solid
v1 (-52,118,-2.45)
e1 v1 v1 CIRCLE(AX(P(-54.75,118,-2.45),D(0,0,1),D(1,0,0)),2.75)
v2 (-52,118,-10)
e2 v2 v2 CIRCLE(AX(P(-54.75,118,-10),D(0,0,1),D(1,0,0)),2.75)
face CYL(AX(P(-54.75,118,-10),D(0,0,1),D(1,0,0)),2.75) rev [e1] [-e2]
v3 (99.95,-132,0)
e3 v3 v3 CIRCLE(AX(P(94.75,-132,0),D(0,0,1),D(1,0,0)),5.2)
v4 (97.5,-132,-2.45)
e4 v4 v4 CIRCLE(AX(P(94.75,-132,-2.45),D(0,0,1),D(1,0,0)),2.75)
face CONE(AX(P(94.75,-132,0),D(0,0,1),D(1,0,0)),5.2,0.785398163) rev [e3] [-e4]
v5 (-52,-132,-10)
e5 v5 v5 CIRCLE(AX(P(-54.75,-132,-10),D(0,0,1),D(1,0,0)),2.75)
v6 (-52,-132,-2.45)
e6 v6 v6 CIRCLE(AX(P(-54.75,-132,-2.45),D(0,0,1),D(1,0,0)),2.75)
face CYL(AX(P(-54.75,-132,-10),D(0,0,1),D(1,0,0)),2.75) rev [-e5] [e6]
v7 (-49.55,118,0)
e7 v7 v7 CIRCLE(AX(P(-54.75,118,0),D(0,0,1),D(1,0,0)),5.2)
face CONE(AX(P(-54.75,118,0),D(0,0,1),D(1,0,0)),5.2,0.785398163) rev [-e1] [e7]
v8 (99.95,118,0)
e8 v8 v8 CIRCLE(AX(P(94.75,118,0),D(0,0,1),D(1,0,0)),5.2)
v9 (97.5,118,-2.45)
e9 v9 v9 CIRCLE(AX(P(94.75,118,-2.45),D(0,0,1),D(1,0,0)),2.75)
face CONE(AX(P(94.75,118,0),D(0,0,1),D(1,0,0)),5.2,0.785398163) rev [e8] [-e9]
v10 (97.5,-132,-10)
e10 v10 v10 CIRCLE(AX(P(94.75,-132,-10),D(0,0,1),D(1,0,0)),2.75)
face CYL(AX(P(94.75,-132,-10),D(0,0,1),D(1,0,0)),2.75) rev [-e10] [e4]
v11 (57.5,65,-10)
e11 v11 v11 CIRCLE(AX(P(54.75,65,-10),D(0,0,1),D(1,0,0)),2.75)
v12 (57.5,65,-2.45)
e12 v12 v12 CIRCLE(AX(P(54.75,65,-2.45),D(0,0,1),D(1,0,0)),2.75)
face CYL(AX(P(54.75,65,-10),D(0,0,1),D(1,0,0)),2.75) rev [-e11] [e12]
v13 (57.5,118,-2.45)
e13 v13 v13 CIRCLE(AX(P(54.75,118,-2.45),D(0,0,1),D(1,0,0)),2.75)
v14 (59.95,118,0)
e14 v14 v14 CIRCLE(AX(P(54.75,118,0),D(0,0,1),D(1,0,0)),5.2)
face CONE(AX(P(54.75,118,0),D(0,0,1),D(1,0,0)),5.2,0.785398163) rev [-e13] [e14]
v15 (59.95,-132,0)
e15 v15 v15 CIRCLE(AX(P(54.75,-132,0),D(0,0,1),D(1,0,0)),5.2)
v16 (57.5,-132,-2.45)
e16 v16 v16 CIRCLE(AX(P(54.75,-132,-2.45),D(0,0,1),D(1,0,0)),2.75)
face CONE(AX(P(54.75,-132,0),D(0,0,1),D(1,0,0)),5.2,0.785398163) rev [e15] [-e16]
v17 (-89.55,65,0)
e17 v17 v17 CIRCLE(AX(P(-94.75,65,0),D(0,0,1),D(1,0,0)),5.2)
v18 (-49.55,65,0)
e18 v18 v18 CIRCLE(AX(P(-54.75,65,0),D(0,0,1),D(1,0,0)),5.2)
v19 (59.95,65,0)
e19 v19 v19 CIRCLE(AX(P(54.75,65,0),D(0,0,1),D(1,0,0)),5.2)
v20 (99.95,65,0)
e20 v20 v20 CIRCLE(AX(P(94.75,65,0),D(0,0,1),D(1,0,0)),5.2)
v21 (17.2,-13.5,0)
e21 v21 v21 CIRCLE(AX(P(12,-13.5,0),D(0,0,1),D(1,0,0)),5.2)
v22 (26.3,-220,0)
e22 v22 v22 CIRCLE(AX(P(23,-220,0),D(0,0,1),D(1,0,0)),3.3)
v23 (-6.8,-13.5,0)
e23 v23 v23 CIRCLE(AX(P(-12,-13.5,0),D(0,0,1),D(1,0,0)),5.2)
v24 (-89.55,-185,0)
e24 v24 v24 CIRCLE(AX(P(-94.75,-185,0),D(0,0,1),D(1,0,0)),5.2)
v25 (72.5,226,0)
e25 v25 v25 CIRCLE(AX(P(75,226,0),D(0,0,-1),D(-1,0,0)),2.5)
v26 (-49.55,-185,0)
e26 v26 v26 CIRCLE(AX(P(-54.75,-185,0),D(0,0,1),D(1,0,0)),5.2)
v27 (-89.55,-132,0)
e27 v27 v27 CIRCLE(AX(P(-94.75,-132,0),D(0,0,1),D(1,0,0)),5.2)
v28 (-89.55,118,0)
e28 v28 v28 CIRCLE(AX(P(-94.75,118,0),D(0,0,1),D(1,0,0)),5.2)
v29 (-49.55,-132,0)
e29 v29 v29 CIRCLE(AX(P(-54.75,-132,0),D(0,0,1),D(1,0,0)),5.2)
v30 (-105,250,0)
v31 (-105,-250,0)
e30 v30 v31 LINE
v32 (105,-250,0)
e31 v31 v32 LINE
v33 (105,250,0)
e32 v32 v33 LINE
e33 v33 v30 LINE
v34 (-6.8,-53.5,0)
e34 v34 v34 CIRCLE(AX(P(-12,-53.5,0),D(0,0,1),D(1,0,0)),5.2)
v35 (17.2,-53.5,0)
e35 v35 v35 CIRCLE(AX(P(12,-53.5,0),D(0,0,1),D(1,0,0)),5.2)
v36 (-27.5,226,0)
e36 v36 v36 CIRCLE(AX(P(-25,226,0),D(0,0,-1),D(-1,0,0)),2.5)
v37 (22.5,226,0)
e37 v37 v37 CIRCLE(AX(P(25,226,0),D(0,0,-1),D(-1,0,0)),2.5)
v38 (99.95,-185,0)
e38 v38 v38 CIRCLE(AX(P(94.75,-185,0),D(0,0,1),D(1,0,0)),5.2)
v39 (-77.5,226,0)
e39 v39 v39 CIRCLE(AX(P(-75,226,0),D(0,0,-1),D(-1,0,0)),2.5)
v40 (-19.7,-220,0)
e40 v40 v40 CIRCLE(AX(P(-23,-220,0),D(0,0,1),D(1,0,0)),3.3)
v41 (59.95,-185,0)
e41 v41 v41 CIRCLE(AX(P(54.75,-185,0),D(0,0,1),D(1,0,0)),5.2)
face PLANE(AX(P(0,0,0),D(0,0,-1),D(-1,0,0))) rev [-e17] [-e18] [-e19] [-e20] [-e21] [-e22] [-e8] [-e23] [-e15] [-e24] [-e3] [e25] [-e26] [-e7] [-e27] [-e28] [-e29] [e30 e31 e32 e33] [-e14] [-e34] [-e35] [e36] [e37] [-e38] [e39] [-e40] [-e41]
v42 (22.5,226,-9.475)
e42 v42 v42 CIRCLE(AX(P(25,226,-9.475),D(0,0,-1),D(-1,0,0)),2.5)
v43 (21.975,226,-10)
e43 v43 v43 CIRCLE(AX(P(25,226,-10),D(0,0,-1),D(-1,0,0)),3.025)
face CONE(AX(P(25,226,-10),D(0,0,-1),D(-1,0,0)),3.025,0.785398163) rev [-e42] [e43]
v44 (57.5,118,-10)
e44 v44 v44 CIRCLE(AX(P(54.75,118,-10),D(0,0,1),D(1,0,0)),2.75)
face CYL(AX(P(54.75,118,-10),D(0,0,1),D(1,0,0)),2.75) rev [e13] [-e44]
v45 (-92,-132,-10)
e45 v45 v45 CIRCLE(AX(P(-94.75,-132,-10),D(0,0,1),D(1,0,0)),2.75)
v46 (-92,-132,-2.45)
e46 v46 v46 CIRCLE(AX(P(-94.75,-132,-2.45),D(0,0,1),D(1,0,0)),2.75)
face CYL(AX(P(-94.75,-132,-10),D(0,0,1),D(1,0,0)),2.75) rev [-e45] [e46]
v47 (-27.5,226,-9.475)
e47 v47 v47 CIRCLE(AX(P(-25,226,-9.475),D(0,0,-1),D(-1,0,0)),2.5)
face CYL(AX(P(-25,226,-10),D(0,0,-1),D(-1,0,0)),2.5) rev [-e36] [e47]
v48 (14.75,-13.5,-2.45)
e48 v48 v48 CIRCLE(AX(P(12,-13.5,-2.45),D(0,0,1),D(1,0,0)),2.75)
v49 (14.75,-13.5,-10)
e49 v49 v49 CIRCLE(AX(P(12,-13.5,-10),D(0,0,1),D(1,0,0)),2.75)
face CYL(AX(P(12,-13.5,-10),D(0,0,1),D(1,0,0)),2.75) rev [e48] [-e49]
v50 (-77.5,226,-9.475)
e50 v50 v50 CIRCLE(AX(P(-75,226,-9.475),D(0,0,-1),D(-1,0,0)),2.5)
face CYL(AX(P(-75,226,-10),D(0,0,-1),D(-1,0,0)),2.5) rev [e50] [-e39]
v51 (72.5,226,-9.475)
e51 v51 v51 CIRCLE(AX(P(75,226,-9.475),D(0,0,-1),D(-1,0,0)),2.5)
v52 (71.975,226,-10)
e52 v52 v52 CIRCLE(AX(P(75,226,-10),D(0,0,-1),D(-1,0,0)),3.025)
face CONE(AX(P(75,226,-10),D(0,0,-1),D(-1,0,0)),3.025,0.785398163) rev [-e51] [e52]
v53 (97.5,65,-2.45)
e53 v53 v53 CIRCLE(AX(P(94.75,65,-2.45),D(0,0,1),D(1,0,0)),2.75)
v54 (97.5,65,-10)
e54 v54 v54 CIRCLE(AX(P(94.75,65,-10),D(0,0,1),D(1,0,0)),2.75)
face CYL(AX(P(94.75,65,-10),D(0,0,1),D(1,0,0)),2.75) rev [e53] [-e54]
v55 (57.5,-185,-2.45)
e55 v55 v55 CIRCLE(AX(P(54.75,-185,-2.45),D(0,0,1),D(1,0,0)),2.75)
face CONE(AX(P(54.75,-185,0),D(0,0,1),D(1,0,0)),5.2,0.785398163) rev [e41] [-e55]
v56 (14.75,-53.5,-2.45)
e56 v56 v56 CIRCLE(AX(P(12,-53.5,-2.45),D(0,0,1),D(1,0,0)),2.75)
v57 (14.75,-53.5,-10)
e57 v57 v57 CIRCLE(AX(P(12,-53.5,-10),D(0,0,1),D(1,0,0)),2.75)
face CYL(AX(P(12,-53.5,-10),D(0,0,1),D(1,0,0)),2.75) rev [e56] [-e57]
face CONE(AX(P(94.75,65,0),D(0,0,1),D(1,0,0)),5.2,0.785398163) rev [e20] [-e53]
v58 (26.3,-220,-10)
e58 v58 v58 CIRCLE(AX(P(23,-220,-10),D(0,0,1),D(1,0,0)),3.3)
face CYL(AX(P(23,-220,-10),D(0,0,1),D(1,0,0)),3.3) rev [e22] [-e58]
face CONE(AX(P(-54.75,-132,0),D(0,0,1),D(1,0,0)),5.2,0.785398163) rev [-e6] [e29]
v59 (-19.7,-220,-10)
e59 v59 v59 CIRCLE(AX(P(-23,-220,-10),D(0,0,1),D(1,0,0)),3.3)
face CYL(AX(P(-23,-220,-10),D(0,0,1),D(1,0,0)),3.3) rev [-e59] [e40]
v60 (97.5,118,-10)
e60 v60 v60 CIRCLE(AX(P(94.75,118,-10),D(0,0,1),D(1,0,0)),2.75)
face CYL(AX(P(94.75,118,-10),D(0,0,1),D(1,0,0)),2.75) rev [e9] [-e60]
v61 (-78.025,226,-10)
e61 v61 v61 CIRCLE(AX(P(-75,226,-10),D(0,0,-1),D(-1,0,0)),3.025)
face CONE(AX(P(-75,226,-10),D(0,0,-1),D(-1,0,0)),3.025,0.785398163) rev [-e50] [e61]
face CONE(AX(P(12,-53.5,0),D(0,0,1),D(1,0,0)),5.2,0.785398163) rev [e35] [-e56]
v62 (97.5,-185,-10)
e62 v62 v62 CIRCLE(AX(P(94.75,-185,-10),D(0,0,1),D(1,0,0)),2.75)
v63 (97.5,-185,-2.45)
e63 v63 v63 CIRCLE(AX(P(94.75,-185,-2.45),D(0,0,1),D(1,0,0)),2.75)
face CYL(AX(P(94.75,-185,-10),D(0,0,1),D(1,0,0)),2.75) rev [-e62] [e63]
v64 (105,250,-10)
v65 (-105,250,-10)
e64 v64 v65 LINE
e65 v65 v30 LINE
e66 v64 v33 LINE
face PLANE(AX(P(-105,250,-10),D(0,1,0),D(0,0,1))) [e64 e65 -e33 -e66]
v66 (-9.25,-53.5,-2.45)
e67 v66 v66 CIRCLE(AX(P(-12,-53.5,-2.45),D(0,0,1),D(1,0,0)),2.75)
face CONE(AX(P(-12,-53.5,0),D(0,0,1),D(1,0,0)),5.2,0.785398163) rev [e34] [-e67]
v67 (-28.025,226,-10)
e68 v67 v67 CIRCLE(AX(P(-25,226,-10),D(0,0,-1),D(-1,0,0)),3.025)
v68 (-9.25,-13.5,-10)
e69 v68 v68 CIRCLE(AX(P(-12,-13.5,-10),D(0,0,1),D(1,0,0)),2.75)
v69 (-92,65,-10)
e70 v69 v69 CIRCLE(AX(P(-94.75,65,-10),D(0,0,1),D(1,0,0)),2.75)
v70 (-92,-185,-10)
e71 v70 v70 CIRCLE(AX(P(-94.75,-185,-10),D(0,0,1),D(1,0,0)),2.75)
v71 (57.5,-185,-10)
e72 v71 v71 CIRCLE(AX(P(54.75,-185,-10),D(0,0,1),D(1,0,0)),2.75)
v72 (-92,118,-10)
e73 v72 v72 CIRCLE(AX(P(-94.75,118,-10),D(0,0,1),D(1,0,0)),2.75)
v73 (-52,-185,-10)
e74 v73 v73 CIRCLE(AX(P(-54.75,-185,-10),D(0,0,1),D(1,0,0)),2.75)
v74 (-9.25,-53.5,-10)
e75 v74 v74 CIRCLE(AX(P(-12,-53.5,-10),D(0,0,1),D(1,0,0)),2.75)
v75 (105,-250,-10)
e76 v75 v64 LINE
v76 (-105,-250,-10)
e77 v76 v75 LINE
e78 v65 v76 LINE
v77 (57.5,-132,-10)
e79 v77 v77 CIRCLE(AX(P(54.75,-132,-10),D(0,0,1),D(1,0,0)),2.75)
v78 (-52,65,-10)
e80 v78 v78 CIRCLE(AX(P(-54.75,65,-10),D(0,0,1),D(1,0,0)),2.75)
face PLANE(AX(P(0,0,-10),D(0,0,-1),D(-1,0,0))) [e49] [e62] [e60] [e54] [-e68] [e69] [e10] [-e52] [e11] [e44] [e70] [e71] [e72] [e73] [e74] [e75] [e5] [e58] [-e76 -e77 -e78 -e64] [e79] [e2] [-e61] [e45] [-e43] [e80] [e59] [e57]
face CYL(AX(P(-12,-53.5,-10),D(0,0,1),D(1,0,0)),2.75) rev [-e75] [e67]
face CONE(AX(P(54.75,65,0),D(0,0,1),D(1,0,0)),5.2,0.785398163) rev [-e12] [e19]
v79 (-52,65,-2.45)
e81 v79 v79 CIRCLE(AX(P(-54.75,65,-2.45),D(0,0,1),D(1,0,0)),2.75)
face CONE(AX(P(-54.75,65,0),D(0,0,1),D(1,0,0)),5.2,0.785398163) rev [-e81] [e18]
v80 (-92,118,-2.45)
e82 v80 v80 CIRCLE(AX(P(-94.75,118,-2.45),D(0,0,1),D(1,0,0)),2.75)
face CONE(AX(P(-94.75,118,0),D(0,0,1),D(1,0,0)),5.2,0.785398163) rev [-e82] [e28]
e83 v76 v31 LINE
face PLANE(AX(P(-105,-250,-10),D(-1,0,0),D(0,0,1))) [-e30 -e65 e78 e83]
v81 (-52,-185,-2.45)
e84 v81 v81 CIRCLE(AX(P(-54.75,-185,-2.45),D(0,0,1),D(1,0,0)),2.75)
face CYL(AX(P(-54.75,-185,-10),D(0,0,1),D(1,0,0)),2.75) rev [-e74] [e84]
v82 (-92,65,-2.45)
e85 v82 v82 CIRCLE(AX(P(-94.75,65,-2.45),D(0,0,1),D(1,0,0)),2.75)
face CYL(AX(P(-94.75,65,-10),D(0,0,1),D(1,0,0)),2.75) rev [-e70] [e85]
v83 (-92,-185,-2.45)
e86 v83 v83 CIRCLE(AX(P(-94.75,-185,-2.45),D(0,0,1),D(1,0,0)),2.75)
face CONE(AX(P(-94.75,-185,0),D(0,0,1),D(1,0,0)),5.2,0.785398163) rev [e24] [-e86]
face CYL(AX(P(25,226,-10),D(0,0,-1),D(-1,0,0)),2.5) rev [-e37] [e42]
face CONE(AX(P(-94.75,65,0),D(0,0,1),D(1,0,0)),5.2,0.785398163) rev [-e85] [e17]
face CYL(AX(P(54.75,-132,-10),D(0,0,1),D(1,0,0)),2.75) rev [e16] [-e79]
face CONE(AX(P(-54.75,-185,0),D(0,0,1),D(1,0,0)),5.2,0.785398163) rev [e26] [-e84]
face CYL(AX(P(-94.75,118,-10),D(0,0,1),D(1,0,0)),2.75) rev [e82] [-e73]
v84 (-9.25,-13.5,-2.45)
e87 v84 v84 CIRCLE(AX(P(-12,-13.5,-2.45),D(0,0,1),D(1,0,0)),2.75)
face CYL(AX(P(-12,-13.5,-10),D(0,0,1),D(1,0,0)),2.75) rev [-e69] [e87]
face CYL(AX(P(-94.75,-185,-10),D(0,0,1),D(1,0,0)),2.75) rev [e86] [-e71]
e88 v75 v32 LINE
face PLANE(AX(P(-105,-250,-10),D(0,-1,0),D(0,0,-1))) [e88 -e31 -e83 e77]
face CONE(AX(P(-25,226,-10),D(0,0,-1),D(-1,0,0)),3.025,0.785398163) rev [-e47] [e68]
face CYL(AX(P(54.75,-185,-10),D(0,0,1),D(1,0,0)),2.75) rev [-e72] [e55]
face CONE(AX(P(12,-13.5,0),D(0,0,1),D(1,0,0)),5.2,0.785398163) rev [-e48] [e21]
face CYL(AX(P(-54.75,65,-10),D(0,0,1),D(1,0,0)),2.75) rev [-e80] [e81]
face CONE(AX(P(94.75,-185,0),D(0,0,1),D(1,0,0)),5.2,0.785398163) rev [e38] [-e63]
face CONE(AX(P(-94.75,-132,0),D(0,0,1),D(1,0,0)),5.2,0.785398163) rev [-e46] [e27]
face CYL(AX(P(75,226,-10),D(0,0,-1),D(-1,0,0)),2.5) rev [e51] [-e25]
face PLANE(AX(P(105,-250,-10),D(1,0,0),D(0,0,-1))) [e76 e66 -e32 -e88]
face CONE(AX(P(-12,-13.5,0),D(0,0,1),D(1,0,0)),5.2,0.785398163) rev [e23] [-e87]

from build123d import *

# Parameters (mm, degrees)
SKETCH1_W                                       = 210
SKETCH1_H                                       = 500
BASE_FLANGE1_DEPTH                              = 10
SKETCH2_R                                       = 2.75
CUT_EXTRUDE1_DEPTH                              = 10
SKETCH3_R                                       = 3.3
CUT_EXTRUDE2_DEPTH                              = 10
SKETCH4_R                                       = 2.75
CUT_EXTRUDE3_DEPTH                              = 10
M6X1_0_TAPPED_HOLE1_D                           = 5
M6X1_0_TAPPED_HOLE1_DEPTH                       = 15
M6X1_0_TAPPED_HOLE1_CSINK_D                     = 6.05
M6X1_0_TAPPED_HOLE1_CSINK_ANGLE                 = 90
M6X1_0_TAPPED_HOLE1_TIP                         = 1.502151548
CSK_FOR_M5_FLAT_HEAD_MACHINE_SCREW1_D           = 5.5
CSK_FOR_M5_FLAT_HEAD_MACHINE_SCREW1_DEPTH       = 24.5
CSK_FOR_M5_FLAT_HEAD_MACHINE_SCREW1_CSINK_D     = 10.4
CSK_FOR_M5_FLAT_HEAD_MACHINE_SCREW1_CSINK_ANGLE = 90
CSK_FOR_M5_FLAT_HEAD_MACHINE_SCREW1_TIP         = 1.652366702
CSK_FOR_M5_FLAT_HEAD_MACHINE_SCREW2_D           = 5.5
CSK_FOR_M5_FLAT_HEAD_MACHINE_SCREW2_DEPTH       = 24.5
CSK_FOR_M5_FLAT_HEAD_MACHINE_SCREW2_CSINK_D     = 10.4
CSK_FOR_M5_FLAT_HEAD_MACHINE_SCREW2_CSINK_ANGLE = 90
CSK_FOR_M5_FLAT_HEAD_MACHINE_SCREW2_TIP         = 1.652366702


# Sheet-metal steps are written as plain solids
with BuildPart() as part:
    # Sketch1 → Base-Flange1 (new body)
    with BuildSketch(Plane.XY):
        Rectangle(SKETCH1_W, SKETCH1_H)
    extrude(amount=-BASE_FLANGE1_DEPTH)

    # Sketch2 → Cut-Extrude1 (cut)
    with BuildSketch(Plane.XY):
        with Locations((-94.75, 118)):
            Circle(SKETCH2_R)
        with Locations((-94.75, 65)):
            Circle(SKETCH2_R)
        with Locations((-54.75, 118)):
            Circle(SKETCH2_R)
        with Locations((-54.75, 65)):
            Circle(SKETCH2_R)
        with Locations((54.75, 118)):
            Circle(SKETCH2_R)
        with Locations((54.75, 65)):
            Circle(SKETCH2_R)
        with Locations((94.75, 118)):
            Circle(SKETCH2_R)
        with Locations((94.75, 65)):
            Circle(SKETCH2_R)
        with Locations((-54.75, -132)):
            Circle(SKETCH2_R)
        with Locations((-94.75, -132)):
            Circle(SKETCH2_R)
        with Locations((-94.75, -185)):
            Circle(SKETCH2_R)
        with Locations((-54.75, -185)):
            Circle(SKETCH2_R)
        with Locations((54.75, -132)):
            Circle(SKETCH2_R)
        with Locations((94.75, -132)):
            Circle(SKETCH2_R)
        with Locations((94.75, -185)):
            Circle(SKETCH2_R)
        with Locations((54.75, -185)):
            Circle(SKETCH2_R)
    extrude(amount=-CUT_EXTRUDE1_DEPTH, mode=Mode.SUBTRACT)

    # Sketch3 → Cut-Extrude2 (cut)
    with BuildSketch(Plane.XY):
        with Locations((-23, -220)):
            Circle(SKETCH3_R)
        with Locations((23, -220)):
            Circle(SKETCH3_R)
    extrude(amount=-CUT_EXTRUDE2_DEPTH, mode=Mode.SUBTRACT)

    # Sketch4 → Cut-Extrude3 (cut)
    with BuildSketch(Plane.XY):
        with Locations((12, -13.5)):
            Circle(SKETCH4_R)
        with Locations((12, -53.5)):
            Circle(SKETCH4_R)
        with Locations((-12, -53.5)):
            Circle(SKETCH4_R)
        with Locations((-12, -13.5)):
            Circle(SKETCH4_R)
    extrude(amount=-CUT_EXTRUDE3_DEPTH, mode=Mode.SUBTRACT)

    # M6x1.0 Tapped Hole1
    with Locations(Plane(origin=(0, 0, -10), x_dir=(-1, 0, 0), z_dir=(0, 0, -1))):
        with Locations((-75, 226), (-25, 226), (25, 226), (75, 226)):
            CounterSinkHole(M6X1_0_TAPPED_HOLE1_D / 2, M6X1_0_TAPPED_HOLE1_CSINK_D / 2, depth=M6X1_0_TAPPED_HOLE1_DEPTH, counter_sink_angle=M6X1_0_TAPPED_HOLE1_CSINK_ANGLE)
            with Locations((0, 0, -(M6X1_0_TAPPED_HOLE1_DEPTH + M6X1_0_TAPPED_HOLE1_TIP / 2))):  # 118° drill point
                Cone(0, M6X1_0_TAPPED_HOLE1_D / 2, M6X1_0_TAPPED_HOLE1_TIP, mode=Mode.SUBTRACT)

    # CSK for M5 Flat Head Machine Screw1
    with Locations(Plane(origin=(0, 0, 0), x_dir=(-1, 0, 0), z_dir=(0, 0, 1))):
        with Locations((-54.75, -118), (-94.75, -118), (-94.75, -65), (-54.75, -65), (54.75, -118), (94.75, -118), (54.75, -65), (94.75, -65), (-94.75, 132), (-54.75, 132), (-94.75, 185), (-54.75, 185), (54.75, 132), (54.75, 185), (94.75, 132), (94.75, 185)):
            CounterSinkHole(CSK_FOR_M5_FLAT_HEAD_MACHINE_SCREW1_D / 2, CSK_FOR_M5_FLAT_HEAD_MACHINE_SCREW1_CSINK_D / 2, depth=CSK_FOR_M5_FLAT_HEAD_MACHINE_SCREW1_DEPTH, counter_sink_angle=CSK_FOR_M5_FLAT_HEAD_MACHINE_SCREW1_CSINK_ANGLE)
            with Locations((0, 0, -(CSK_FOR_M5_FLAT_HEAD_MACHINE_SCREW1_DEPTH + CSK_FOR_M5_FLAT_HEAD_MACHINE_SCREW1_TIP / 2))):  # 118° drill point
                Cone(0, CSK_FOR_M5_FLAT_HEAD_MACHINE_SCREW1_D / 2, CSK_FOR_M5_FLAT_HEAD_MACHINE_SCREW1_TIP, mode=Mode.SUBTRACT)

    # CSK for M5 Flat Head Machine Screw2
    with Locations(Plane.XY):
        with Locations((12, -13.5), (-12, -13.5), (-12, -53.5), (12, -53.5)):
            CounterSinkHole(CSK_FOR_M5_FLAT_HEAD_MACHINE_SCREW2_D / 2, CSK_FOR_M5_FLAT_HEAD_MACHINE_SCREW2_CSINK_D / 2, depth=CSK_FOR_M5_FLAT_HEAD_MACHINE_SCREW2_DEPTH, counter_sink_angle=CSK_FOR_M5_FLAT_HEAD_MACHINE_SCREW2_CSINK_ANGLE)
            with Locations((0, 0, -(CSK_FOR_M5_FLAT_HEAD_MACHINE_SCREW2_DEPTH + CSK_FOR_M5_FLAT_HEAD_MACHINE_SCREW2_TIP / 2))):  # 118° drill point
                Cone(0, CSK_FOR_M5_FLAT_HEAD_MACHINE_SCREW2_D / 2, CSK_FOR_M5_FLAT_HEAD_MACHINE_SCREW2_TIP, mode=Mode.SUBTRACT)


solid = part.part
